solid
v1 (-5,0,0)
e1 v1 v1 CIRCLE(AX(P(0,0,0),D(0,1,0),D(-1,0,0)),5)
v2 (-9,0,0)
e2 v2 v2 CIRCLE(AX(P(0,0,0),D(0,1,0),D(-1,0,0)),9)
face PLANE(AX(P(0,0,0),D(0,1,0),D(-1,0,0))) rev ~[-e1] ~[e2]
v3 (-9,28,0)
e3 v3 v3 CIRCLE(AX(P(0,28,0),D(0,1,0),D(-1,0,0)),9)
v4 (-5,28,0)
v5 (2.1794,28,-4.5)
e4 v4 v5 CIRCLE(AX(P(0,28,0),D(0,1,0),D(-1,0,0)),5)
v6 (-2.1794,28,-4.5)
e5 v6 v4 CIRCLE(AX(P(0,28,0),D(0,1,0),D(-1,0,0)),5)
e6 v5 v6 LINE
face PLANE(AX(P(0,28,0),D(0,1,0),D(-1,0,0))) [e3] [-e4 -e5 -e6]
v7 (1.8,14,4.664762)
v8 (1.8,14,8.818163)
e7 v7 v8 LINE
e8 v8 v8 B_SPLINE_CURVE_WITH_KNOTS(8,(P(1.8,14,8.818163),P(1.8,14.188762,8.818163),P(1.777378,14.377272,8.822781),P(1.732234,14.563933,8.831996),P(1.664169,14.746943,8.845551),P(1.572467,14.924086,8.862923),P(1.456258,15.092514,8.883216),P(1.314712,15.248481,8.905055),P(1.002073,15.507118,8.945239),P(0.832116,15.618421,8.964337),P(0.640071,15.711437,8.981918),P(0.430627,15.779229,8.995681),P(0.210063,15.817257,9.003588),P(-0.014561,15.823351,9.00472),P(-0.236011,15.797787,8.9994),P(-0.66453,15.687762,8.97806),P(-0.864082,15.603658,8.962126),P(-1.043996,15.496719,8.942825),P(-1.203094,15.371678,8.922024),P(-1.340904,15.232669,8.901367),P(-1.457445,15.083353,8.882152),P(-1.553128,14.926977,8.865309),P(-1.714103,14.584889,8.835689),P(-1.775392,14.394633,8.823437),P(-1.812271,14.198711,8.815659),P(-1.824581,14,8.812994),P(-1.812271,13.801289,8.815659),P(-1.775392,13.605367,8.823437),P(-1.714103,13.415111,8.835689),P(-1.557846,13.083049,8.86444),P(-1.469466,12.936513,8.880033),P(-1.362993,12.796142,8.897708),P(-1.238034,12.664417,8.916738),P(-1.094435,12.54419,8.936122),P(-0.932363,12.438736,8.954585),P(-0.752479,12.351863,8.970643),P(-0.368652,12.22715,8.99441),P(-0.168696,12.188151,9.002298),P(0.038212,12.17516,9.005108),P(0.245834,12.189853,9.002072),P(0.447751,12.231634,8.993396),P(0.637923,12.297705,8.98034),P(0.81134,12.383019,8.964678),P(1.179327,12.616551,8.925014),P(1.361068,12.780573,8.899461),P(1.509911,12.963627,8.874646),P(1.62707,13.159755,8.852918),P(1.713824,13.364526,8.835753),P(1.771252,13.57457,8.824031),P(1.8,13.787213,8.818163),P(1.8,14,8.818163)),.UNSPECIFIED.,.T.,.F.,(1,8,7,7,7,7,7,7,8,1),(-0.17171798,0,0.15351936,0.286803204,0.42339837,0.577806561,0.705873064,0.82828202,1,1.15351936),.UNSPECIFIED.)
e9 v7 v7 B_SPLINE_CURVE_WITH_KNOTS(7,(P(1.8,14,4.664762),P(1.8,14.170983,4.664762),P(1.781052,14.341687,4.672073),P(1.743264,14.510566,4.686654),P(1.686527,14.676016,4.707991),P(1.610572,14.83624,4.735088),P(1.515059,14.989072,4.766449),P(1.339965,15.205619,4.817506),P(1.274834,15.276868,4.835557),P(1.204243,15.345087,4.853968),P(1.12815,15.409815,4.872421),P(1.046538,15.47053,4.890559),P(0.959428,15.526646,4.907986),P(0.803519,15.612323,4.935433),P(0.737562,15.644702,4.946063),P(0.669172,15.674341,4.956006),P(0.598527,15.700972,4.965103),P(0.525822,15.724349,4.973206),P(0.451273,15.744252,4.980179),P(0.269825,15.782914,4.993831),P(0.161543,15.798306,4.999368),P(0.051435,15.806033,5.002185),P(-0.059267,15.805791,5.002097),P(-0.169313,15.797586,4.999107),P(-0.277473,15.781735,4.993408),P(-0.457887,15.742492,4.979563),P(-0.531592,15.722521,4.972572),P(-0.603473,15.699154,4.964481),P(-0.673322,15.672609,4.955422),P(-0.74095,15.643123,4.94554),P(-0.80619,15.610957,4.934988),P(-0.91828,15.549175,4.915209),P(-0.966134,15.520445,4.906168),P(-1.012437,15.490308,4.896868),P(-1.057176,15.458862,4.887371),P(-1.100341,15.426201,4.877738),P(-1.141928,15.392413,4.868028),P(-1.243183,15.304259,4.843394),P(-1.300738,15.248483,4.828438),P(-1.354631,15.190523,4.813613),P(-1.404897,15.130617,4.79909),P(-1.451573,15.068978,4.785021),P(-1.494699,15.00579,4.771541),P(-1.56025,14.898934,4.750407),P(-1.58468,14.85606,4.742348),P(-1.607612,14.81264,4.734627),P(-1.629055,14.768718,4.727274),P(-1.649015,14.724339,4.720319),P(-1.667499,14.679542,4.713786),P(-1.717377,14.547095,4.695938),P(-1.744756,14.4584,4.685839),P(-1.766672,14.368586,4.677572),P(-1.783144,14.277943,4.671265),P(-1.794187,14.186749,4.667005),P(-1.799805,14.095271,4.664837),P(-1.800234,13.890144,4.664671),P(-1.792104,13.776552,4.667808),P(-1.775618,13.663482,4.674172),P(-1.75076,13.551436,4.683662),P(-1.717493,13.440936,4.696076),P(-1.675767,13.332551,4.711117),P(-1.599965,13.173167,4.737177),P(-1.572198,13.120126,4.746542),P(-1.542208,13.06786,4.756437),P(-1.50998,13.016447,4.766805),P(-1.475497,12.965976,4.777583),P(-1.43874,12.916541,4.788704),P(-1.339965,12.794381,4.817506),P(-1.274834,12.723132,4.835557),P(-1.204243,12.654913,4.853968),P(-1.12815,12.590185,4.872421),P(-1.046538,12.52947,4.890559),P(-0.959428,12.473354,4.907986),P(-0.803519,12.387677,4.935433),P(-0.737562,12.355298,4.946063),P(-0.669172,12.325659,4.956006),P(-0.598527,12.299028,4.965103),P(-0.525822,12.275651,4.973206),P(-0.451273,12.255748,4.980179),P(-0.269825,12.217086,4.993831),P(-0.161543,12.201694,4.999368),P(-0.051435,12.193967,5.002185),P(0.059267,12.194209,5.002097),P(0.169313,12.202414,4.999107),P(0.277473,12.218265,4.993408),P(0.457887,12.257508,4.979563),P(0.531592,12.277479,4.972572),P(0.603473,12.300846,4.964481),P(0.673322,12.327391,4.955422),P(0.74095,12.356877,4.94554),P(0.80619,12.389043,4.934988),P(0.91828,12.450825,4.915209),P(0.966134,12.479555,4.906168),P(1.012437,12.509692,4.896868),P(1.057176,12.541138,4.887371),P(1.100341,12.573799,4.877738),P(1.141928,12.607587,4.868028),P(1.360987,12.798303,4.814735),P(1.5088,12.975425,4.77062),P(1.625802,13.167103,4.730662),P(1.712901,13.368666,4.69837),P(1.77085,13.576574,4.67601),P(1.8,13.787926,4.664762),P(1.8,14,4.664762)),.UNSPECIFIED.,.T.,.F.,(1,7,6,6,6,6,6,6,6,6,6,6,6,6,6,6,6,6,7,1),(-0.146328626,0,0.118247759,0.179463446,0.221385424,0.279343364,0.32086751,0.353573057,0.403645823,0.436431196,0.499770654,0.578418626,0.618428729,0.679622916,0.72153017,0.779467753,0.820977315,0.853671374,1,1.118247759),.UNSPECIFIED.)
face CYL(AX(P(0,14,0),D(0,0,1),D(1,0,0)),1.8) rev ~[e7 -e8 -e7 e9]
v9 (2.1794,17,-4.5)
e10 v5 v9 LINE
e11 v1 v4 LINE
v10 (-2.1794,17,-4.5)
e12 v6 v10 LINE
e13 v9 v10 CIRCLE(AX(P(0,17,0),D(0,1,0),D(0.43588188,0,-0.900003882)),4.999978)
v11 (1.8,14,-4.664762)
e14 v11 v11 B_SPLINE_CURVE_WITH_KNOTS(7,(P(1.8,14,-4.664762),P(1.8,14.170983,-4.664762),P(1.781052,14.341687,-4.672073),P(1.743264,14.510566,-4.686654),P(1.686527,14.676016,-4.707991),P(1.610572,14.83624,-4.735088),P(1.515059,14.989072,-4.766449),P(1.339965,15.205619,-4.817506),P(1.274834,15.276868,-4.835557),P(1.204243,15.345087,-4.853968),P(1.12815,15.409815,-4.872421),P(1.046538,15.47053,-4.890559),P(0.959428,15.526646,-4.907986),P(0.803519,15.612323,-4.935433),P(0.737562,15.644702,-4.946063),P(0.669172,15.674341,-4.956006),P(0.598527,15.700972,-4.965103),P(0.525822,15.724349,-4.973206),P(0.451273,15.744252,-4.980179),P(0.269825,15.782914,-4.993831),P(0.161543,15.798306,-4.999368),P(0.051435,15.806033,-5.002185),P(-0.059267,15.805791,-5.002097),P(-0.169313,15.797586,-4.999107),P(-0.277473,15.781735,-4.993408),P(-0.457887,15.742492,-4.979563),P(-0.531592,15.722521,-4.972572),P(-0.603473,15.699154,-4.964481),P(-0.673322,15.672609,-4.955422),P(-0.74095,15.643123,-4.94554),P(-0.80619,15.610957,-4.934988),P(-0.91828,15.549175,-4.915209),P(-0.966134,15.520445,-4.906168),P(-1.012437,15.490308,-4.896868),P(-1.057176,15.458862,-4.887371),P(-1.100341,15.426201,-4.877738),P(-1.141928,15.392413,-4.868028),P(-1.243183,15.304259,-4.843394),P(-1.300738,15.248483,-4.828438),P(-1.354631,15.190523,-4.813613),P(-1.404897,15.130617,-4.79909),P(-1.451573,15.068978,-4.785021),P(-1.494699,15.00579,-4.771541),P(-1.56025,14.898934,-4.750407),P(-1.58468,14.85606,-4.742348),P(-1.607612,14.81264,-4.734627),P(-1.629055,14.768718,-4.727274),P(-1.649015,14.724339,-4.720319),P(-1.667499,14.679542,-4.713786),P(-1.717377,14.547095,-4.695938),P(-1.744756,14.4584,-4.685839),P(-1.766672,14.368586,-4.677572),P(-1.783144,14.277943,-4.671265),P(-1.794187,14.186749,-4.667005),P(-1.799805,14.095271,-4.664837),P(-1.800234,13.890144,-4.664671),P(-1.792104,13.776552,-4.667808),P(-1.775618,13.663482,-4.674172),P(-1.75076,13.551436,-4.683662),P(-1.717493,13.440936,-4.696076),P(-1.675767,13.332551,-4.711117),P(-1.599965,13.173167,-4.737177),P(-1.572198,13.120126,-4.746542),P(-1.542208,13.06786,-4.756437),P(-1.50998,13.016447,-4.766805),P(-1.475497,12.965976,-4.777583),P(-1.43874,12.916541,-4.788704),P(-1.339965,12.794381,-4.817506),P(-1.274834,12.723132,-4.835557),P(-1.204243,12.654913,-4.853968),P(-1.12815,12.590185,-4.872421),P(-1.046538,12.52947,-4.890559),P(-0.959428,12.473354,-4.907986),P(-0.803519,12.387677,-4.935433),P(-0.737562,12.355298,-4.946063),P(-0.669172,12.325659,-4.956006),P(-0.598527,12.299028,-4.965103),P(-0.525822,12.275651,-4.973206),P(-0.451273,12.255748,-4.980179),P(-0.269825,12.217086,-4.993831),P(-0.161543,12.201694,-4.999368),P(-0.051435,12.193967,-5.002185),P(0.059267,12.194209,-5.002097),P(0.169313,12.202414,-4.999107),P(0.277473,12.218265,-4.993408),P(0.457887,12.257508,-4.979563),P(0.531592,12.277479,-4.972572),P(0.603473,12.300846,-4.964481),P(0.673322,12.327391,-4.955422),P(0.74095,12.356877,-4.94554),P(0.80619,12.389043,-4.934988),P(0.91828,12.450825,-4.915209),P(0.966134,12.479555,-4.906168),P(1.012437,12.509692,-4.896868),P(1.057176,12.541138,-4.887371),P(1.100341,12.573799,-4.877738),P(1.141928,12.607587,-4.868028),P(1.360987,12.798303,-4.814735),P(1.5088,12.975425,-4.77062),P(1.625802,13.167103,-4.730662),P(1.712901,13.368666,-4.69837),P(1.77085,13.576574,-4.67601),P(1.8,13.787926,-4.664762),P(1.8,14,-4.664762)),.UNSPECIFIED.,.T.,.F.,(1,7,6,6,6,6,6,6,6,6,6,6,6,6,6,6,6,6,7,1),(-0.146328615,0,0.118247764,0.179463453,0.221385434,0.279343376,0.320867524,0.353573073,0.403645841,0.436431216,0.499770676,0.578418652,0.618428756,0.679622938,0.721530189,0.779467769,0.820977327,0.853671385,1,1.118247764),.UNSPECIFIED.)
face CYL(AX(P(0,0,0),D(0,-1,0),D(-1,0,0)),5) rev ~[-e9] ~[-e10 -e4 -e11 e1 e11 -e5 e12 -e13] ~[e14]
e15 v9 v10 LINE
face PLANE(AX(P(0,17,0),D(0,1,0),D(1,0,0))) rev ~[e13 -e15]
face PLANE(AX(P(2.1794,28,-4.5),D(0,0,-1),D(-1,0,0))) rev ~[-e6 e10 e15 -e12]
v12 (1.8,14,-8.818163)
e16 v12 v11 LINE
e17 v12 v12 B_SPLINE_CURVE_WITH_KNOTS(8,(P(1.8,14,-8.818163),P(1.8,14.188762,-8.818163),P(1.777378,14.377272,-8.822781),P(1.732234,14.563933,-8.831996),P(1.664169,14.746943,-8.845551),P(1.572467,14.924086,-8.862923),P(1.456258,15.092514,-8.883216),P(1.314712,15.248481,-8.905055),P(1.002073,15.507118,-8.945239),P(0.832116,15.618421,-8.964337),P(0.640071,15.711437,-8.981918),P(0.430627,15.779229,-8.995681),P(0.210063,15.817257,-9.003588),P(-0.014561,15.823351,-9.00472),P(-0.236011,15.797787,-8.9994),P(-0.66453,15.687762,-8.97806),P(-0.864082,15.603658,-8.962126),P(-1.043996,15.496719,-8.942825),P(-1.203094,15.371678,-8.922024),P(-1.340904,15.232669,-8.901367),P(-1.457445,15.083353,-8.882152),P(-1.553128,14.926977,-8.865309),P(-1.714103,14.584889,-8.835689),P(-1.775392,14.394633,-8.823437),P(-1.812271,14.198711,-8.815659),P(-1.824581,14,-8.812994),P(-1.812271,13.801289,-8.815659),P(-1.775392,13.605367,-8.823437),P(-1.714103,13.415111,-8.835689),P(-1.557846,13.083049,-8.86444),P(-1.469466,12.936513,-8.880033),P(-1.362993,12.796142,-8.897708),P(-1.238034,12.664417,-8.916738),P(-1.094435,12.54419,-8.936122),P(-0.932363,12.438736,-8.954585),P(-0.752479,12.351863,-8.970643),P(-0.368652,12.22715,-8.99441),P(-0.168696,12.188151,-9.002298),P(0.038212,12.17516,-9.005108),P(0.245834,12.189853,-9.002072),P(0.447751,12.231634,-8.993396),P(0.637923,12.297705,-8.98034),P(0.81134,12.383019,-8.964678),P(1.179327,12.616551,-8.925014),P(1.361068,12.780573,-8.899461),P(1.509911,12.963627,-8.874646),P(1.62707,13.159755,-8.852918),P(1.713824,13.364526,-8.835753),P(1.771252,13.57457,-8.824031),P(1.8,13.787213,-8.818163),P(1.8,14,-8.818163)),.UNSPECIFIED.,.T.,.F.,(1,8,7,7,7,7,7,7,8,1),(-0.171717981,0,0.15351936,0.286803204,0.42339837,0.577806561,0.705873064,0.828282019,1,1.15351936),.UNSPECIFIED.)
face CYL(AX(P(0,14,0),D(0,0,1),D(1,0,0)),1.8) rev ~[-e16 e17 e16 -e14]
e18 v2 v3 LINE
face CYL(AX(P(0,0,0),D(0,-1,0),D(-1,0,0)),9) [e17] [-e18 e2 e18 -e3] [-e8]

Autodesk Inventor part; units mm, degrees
ref_plane "YZ Plane" through (0, 0, 0) normal (1, 0, 0) x (0, 1, 0)
ref_plane "XZ Plane" through (0, 0, 0) normal (0, 1, 0) x (-1, 0, 0)
ref_plane "XY Plane" through (0, 0, 0) normal (0, 0, 1) x (1, 0, 0)
sketch "Sketch1" plane through (0, 0, 0) normal (0, 1, 0) x (-1, 0, 0)
  circle A0 centre (0, 0) radius 5
  circle A1 centre (0, 0) radius 9
  dimension "d0" = 10
  dimension "d1" = 4
extrude "Extrusion1" add sketch "Sketch1" along normal blind 28
sketch "Sketch2" plane through (0, 0, 0) normal (0, 0, 1) x (1, 0, 0)
  line L0 (9, 28) -> (-9, 28) projected
  line L1 (0, 28) -> (0, 0)
  circle A0 centre (0, 14) radius 1.8
  dimension "d4" = 3.6
extrude "Extrusion2" cut sketch "Sketch2" along normal mid plane 20
sketch "Sketch4" plane through (0, 28, 0) normal (0, 1, 0) x (1, 0, 0)
  line L0 (2.1794, 4.5) -> (-2.1794, 4.5)
  arc A0 (2.1794, 4.5) -> (-2.1794, 4.5) centre (0, 0) ccw
extrude "Extrusion3" add sketch "Sketch4" against normal blind 11
properties part number "shaft_connector"
